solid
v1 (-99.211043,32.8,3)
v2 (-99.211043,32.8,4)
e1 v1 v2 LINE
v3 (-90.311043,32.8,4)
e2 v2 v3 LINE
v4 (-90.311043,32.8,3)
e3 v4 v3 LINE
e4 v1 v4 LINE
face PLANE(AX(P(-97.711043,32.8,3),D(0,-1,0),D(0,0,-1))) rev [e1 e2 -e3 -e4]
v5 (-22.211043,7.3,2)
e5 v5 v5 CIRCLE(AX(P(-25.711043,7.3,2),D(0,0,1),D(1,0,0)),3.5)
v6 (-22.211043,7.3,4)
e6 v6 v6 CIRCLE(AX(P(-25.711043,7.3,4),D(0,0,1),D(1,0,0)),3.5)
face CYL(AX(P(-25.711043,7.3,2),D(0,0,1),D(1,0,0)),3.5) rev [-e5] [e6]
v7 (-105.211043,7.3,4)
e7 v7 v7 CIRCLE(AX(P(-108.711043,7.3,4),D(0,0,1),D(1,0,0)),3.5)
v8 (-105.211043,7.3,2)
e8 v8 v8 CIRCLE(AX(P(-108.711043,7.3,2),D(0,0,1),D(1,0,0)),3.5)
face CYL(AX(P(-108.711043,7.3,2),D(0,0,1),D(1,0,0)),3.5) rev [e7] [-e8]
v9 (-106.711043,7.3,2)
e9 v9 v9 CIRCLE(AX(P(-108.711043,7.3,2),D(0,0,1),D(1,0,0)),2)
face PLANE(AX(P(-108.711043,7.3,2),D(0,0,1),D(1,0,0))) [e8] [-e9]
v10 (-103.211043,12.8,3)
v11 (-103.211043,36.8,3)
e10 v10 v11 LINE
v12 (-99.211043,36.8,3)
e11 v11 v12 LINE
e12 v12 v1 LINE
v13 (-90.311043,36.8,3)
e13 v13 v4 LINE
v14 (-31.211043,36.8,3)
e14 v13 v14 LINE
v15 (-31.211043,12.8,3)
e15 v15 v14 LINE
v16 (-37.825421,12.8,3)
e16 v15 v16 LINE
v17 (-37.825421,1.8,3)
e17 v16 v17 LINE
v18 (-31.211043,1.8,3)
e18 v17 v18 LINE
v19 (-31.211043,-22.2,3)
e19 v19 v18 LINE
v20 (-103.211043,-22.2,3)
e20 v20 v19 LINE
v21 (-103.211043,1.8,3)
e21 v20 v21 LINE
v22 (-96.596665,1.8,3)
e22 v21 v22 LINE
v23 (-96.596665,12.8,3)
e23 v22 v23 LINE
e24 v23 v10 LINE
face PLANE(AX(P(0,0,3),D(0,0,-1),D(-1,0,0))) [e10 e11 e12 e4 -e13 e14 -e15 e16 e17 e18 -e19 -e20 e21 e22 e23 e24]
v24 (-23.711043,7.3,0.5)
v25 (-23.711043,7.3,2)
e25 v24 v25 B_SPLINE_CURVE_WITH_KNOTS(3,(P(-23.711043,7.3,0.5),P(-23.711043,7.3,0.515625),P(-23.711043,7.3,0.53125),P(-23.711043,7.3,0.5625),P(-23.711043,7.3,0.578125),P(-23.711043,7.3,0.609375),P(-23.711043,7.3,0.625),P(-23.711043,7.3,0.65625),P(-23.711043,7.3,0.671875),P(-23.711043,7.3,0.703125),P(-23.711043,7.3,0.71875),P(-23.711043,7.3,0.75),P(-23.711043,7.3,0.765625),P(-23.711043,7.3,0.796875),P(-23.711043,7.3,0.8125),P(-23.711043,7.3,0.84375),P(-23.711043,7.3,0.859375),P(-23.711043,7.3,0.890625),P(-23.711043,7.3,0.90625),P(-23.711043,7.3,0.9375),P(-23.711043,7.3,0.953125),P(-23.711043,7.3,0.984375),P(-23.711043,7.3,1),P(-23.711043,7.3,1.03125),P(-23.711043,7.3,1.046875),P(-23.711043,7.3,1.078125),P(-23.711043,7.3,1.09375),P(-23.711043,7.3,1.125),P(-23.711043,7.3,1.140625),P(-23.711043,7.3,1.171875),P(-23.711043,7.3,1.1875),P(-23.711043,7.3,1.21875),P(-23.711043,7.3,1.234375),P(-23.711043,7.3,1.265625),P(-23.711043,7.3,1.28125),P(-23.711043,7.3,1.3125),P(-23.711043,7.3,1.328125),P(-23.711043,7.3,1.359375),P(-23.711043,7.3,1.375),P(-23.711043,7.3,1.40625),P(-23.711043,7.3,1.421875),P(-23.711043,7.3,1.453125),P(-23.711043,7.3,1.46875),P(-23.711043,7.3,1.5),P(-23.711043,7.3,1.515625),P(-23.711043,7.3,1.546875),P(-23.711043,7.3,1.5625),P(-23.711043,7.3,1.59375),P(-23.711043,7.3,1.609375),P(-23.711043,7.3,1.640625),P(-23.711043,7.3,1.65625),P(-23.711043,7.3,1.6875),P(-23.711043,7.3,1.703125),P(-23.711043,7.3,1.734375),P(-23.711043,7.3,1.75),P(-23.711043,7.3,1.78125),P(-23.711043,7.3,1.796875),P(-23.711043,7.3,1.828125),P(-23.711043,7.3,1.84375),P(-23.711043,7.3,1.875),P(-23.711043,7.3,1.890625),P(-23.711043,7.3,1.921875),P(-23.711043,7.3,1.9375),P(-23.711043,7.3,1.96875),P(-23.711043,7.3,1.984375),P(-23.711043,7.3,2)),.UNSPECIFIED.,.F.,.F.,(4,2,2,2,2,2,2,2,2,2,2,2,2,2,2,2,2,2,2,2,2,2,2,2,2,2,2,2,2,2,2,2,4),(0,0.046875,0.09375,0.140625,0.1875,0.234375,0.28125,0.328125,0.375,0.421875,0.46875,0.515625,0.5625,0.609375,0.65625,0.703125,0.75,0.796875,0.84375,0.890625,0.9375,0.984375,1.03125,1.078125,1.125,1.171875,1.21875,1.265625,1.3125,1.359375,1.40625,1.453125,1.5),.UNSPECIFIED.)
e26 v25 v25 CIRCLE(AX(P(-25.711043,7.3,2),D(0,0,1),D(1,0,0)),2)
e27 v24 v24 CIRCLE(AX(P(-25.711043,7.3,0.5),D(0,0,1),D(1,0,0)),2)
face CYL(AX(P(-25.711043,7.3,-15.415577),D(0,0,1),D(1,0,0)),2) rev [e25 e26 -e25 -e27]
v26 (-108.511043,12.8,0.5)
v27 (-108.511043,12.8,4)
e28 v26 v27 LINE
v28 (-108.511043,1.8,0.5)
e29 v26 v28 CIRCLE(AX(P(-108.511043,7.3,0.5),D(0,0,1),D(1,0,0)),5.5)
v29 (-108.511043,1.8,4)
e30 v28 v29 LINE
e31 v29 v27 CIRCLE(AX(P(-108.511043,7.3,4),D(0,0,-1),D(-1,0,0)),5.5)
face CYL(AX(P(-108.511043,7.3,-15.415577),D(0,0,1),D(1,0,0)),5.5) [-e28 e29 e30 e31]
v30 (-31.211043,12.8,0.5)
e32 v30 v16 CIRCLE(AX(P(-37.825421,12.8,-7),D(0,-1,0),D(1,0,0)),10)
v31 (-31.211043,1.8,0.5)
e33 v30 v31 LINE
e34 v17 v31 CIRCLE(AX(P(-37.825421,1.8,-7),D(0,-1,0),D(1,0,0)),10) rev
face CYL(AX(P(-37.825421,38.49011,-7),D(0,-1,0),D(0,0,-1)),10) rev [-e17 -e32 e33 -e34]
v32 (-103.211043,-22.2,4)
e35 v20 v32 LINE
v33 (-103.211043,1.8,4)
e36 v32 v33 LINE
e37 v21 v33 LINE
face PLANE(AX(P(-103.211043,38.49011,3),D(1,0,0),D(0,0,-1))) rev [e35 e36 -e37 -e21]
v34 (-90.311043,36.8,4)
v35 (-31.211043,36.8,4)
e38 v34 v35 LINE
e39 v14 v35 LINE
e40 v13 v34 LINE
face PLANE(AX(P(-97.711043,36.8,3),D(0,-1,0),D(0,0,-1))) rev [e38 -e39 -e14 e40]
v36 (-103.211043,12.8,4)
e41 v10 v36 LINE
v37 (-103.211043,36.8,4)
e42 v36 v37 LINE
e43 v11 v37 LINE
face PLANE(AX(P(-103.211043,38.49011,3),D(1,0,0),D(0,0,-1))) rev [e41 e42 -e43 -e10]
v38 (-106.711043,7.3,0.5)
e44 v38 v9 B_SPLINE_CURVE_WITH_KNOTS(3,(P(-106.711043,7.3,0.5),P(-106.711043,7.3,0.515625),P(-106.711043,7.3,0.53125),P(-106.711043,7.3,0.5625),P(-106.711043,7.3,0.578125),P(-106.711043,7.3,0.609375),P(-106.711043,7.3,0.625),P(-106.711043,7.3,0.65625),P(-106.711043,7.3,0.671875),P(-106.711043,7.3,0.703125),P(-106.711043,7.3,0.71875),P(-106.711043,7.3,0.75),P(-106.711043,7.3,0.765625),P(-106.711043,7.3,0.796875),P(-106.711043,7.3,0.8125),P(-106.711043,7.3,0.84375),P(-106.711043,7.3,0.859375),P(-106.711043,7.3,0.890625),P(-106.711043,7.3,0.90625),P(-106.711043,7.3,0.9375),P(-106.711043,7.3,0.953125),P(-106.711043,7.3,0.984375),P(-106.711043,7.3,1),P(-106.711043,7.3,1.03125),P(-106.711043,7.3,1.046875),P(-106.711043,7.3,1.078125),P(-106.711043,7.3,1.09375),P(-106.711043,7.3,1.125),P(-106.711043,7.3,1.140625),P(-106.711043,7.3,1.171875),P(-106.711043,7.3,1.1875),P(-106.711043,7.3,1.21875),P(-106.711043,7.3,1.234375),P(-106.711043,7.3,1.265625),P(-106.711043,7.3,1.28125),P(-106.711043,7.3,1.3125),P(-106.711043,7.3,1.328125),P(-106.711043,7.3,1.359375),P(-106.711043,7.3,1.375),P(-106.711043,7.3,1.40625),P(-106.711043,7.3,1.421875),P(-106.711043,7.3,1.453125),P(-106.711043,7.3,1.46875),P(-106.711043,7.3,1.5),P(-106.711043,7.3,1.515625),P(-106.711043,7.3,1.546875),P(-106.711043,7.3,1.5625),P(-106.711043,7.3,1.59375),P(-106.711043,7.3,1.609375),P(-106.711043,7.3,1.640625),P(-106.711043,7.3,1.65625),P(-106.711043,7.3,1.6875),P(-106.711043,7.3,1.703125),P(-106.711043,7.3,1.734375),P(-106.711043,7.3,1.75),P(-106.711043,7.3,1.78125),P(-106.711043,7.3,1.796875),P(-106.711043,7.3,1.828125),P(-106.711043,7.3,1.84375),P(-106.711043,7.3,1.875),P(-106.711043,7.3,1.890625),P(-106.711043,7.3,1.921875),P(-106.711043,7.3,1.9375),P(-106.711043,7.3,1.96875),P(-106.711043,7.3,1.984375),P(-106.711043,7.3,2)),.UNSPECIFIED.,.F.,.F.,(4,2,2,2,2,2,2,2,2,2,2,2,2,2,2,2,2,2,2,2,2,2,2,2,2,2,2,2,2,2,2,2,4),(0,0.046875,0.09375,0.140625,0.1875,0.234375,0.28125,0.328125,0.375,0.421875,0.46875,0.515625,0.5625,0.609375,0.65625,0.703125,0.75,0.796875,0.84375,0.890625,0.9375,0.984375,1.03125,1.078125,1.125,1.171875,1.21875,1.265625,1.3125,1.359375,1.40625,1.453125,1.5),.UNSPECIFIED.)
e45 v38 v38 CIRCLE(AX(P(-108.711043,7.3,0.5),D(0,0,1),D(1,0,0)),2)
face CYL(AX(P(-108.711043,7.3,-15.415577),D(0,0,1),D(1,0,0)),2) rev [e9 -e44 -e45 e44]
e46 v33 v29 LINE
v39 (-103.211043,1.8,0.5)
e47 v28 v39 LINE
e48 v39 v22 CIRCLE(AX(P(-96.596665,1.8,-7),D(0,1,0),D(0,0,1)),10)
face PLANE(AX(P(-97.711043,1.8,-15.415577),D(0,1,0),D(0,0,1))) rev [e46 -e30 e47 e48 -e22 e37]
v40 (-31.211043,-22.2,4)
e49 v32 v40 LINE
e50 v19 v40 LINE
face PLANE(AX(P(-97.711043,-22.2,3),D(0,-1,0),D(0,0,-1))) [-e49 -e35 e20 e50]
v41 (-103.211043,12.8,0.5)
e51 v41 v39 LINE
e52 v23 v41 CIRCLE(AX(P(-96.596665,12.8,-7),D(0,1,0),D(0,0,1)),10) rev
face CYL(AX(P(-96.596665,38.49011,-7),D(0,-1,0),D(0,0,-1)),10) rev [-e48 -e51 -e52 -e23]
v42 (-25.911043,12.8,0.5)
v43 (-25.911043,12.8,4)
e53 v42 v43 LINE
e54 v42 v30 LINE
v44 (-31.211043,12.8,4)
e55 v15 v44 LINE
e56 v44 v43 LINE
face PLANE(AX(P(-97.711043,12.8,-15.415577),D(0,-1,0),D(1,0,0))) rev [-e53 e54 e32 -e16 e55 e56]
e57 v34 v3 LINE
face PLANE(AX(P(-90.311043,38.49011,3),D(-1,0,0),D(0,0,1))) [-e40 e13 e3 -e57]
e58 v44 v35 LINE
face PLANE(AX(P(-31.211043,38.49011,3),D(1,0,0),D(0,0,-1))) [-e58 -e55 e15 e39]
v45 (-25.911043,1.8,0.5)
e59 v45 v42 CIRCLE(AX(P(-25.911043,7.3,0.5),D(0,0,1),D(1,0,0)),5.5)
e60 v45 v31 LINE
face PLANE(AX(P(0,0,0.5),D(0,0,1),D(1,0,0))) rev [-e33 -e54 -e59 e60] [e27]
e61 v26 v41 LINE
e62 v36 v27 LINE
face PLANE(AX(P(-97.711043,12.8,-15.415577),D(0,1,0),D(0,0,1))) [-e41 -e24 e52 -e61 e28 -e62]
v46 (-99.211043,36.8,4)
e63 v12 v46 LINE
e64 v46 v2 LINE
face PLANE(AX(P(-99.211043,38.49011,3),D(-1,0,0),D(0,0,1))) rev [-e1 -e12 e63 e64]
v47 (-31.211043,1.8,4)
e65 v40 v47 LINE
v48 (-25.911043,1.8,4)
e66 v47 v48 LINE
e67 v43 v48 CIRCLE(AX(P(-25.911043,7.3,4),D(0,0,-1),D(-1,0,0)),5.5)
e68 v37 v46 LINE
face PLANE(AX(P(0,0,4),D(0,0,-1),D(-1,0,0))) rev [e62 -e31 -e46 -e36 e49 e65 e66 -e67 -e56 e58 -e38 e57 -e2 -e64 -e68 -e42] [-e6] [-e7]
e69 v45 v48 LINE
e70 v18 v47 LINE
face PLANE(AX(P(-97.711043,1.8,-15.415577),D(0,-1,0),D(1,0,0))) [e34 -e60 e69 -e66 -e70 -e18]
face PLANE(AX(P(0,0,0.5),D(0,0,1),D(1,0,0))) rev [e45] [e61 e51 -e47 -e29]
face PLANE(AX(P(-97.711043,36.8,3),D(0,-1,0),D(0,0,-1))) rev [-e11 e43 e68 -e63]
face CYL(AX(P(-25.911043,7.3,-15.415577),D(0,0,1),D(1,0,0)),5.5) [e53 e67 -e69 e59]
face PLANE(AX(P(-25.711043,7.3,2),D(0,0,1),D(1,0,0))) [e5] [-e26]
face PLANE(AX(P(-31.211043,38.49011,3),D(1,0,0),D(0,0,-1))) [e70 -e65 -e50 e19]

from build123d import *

# Parameters (mm, degrees)
BOSS_EXTRUDE1_START = 3
BOSS_EXTRUDE1_DEPTH = 1
BOSS_EXTRUDE2_START = 0.5
SKETCH1_3_R         = 2
BOSS_EXTRUDE2_DEPTH = 3.5
FILLET1_R           = 10
SKETCH2_R           = 3.5
CUT_EXTRUDE1_DEPTH  = 2


with BuildPart() as part:
    # Sketch1 → Boss-Extrude1 (new body)
    with BuildSketch(Plane.XY.offset(BOSS_EXTRUDE1_START)):
        Polygon((-103.211042913, -22.2), (-31.211042913, -22.2), (-31.211042913, 36.8), (-90.311042913, 36.8), (-90.311042913, 32.8), (-99.211042913, 32.8), (-99.211042913, 36.8), (-103.211042913, 36.8), align=None)
    extrude(amount=BOSS_EXTRUDE1_DEPTH)

    # Sketch1<3> → Boss-Extrude2 (add)
    # profile 1 of 2: a face of its own
    with BuildSketch(Plane.XY.offset(BOSS_EXTRUDE2_START)):
        with BuildLine():
            Line((-108.511042913, 1.8), (-103.211042913, 1.8))
            Line((-103.211042913, 1.8), (-103.211042913, 12.8))
            Line((-103.211042913, 12.8), (-108.511042913, 12.8))
            ThreePointArc((-108.511042913, 12.8), (-114.011042913, 7.3), (-108.511042913, 1.8))
        make_face()
        with Locations((-108.711042913, 7.3)):
            Circle(SKETCH1_3_R, mode=Mode.SUBTRACT)
    # profile 2 of 2: a face of its own
    with BuildSketch(Plane.XY.offset(BOSS_EXTRUDE2_START)):
        with BuildLine():
            Line((-31.211042913, 12.8), (-31.211042913, 1.8))
            Line((-31.211042913, 1.8), (-25.911042913, 1.8))
            ThreePointArc((-25.911042913, 1.8), (-20.411042913, 7.3), (-25.911042913, 12.8))
            Line((-25.911042913, 12.8), (-31.211042913, 12.8))
        make_face()
        with Locations((-25.711042913, 7.3)):
            Circle(SKETCH1_3_R, mode=Mode.SUBTRACT)
    extrude(amount=BOSS_EXTRUDE2_DEPTH)

    # Fillet1
    # the kernel refuses this fillet: 10 mm, written as the material it adds along each edge
    with BuildSketch(Plane(origin=(-31.211042913, 1.8, 3), x_dir=(-1, 0, 0), z_dir=(0, 1, 0)), Plane(origin=(-103.211042913, 12.8, 3), x_dir=(1, 0, 0), z_dir=(0, -1, 0))) as fillet1_piece_1:
        with BuildLine():
            CenterArc((6.614378278, -10), FILLET1_R, 90, 41.409622109)
            Line((0, -2.5), (0, 0))
            Line((0, 0), (6.614378278, 0))
        make_face()
    extrude(amount=11)

    # Sketch2 → Cut-Extrude1 (cut)
    with BuildSketch(Plane.XY.offset(4)):
        with Locations((-108.711042913, 7.3)):
            Circle(SKETCH2_R)
        with Locations((-25.711042913, 7.3)):
            Circle(SKETCH2_R)
    extrude(amount=-CUT_EXTRUDE1_DEPTH, mode=Mode.SUBTRACT)


solid = part.part
